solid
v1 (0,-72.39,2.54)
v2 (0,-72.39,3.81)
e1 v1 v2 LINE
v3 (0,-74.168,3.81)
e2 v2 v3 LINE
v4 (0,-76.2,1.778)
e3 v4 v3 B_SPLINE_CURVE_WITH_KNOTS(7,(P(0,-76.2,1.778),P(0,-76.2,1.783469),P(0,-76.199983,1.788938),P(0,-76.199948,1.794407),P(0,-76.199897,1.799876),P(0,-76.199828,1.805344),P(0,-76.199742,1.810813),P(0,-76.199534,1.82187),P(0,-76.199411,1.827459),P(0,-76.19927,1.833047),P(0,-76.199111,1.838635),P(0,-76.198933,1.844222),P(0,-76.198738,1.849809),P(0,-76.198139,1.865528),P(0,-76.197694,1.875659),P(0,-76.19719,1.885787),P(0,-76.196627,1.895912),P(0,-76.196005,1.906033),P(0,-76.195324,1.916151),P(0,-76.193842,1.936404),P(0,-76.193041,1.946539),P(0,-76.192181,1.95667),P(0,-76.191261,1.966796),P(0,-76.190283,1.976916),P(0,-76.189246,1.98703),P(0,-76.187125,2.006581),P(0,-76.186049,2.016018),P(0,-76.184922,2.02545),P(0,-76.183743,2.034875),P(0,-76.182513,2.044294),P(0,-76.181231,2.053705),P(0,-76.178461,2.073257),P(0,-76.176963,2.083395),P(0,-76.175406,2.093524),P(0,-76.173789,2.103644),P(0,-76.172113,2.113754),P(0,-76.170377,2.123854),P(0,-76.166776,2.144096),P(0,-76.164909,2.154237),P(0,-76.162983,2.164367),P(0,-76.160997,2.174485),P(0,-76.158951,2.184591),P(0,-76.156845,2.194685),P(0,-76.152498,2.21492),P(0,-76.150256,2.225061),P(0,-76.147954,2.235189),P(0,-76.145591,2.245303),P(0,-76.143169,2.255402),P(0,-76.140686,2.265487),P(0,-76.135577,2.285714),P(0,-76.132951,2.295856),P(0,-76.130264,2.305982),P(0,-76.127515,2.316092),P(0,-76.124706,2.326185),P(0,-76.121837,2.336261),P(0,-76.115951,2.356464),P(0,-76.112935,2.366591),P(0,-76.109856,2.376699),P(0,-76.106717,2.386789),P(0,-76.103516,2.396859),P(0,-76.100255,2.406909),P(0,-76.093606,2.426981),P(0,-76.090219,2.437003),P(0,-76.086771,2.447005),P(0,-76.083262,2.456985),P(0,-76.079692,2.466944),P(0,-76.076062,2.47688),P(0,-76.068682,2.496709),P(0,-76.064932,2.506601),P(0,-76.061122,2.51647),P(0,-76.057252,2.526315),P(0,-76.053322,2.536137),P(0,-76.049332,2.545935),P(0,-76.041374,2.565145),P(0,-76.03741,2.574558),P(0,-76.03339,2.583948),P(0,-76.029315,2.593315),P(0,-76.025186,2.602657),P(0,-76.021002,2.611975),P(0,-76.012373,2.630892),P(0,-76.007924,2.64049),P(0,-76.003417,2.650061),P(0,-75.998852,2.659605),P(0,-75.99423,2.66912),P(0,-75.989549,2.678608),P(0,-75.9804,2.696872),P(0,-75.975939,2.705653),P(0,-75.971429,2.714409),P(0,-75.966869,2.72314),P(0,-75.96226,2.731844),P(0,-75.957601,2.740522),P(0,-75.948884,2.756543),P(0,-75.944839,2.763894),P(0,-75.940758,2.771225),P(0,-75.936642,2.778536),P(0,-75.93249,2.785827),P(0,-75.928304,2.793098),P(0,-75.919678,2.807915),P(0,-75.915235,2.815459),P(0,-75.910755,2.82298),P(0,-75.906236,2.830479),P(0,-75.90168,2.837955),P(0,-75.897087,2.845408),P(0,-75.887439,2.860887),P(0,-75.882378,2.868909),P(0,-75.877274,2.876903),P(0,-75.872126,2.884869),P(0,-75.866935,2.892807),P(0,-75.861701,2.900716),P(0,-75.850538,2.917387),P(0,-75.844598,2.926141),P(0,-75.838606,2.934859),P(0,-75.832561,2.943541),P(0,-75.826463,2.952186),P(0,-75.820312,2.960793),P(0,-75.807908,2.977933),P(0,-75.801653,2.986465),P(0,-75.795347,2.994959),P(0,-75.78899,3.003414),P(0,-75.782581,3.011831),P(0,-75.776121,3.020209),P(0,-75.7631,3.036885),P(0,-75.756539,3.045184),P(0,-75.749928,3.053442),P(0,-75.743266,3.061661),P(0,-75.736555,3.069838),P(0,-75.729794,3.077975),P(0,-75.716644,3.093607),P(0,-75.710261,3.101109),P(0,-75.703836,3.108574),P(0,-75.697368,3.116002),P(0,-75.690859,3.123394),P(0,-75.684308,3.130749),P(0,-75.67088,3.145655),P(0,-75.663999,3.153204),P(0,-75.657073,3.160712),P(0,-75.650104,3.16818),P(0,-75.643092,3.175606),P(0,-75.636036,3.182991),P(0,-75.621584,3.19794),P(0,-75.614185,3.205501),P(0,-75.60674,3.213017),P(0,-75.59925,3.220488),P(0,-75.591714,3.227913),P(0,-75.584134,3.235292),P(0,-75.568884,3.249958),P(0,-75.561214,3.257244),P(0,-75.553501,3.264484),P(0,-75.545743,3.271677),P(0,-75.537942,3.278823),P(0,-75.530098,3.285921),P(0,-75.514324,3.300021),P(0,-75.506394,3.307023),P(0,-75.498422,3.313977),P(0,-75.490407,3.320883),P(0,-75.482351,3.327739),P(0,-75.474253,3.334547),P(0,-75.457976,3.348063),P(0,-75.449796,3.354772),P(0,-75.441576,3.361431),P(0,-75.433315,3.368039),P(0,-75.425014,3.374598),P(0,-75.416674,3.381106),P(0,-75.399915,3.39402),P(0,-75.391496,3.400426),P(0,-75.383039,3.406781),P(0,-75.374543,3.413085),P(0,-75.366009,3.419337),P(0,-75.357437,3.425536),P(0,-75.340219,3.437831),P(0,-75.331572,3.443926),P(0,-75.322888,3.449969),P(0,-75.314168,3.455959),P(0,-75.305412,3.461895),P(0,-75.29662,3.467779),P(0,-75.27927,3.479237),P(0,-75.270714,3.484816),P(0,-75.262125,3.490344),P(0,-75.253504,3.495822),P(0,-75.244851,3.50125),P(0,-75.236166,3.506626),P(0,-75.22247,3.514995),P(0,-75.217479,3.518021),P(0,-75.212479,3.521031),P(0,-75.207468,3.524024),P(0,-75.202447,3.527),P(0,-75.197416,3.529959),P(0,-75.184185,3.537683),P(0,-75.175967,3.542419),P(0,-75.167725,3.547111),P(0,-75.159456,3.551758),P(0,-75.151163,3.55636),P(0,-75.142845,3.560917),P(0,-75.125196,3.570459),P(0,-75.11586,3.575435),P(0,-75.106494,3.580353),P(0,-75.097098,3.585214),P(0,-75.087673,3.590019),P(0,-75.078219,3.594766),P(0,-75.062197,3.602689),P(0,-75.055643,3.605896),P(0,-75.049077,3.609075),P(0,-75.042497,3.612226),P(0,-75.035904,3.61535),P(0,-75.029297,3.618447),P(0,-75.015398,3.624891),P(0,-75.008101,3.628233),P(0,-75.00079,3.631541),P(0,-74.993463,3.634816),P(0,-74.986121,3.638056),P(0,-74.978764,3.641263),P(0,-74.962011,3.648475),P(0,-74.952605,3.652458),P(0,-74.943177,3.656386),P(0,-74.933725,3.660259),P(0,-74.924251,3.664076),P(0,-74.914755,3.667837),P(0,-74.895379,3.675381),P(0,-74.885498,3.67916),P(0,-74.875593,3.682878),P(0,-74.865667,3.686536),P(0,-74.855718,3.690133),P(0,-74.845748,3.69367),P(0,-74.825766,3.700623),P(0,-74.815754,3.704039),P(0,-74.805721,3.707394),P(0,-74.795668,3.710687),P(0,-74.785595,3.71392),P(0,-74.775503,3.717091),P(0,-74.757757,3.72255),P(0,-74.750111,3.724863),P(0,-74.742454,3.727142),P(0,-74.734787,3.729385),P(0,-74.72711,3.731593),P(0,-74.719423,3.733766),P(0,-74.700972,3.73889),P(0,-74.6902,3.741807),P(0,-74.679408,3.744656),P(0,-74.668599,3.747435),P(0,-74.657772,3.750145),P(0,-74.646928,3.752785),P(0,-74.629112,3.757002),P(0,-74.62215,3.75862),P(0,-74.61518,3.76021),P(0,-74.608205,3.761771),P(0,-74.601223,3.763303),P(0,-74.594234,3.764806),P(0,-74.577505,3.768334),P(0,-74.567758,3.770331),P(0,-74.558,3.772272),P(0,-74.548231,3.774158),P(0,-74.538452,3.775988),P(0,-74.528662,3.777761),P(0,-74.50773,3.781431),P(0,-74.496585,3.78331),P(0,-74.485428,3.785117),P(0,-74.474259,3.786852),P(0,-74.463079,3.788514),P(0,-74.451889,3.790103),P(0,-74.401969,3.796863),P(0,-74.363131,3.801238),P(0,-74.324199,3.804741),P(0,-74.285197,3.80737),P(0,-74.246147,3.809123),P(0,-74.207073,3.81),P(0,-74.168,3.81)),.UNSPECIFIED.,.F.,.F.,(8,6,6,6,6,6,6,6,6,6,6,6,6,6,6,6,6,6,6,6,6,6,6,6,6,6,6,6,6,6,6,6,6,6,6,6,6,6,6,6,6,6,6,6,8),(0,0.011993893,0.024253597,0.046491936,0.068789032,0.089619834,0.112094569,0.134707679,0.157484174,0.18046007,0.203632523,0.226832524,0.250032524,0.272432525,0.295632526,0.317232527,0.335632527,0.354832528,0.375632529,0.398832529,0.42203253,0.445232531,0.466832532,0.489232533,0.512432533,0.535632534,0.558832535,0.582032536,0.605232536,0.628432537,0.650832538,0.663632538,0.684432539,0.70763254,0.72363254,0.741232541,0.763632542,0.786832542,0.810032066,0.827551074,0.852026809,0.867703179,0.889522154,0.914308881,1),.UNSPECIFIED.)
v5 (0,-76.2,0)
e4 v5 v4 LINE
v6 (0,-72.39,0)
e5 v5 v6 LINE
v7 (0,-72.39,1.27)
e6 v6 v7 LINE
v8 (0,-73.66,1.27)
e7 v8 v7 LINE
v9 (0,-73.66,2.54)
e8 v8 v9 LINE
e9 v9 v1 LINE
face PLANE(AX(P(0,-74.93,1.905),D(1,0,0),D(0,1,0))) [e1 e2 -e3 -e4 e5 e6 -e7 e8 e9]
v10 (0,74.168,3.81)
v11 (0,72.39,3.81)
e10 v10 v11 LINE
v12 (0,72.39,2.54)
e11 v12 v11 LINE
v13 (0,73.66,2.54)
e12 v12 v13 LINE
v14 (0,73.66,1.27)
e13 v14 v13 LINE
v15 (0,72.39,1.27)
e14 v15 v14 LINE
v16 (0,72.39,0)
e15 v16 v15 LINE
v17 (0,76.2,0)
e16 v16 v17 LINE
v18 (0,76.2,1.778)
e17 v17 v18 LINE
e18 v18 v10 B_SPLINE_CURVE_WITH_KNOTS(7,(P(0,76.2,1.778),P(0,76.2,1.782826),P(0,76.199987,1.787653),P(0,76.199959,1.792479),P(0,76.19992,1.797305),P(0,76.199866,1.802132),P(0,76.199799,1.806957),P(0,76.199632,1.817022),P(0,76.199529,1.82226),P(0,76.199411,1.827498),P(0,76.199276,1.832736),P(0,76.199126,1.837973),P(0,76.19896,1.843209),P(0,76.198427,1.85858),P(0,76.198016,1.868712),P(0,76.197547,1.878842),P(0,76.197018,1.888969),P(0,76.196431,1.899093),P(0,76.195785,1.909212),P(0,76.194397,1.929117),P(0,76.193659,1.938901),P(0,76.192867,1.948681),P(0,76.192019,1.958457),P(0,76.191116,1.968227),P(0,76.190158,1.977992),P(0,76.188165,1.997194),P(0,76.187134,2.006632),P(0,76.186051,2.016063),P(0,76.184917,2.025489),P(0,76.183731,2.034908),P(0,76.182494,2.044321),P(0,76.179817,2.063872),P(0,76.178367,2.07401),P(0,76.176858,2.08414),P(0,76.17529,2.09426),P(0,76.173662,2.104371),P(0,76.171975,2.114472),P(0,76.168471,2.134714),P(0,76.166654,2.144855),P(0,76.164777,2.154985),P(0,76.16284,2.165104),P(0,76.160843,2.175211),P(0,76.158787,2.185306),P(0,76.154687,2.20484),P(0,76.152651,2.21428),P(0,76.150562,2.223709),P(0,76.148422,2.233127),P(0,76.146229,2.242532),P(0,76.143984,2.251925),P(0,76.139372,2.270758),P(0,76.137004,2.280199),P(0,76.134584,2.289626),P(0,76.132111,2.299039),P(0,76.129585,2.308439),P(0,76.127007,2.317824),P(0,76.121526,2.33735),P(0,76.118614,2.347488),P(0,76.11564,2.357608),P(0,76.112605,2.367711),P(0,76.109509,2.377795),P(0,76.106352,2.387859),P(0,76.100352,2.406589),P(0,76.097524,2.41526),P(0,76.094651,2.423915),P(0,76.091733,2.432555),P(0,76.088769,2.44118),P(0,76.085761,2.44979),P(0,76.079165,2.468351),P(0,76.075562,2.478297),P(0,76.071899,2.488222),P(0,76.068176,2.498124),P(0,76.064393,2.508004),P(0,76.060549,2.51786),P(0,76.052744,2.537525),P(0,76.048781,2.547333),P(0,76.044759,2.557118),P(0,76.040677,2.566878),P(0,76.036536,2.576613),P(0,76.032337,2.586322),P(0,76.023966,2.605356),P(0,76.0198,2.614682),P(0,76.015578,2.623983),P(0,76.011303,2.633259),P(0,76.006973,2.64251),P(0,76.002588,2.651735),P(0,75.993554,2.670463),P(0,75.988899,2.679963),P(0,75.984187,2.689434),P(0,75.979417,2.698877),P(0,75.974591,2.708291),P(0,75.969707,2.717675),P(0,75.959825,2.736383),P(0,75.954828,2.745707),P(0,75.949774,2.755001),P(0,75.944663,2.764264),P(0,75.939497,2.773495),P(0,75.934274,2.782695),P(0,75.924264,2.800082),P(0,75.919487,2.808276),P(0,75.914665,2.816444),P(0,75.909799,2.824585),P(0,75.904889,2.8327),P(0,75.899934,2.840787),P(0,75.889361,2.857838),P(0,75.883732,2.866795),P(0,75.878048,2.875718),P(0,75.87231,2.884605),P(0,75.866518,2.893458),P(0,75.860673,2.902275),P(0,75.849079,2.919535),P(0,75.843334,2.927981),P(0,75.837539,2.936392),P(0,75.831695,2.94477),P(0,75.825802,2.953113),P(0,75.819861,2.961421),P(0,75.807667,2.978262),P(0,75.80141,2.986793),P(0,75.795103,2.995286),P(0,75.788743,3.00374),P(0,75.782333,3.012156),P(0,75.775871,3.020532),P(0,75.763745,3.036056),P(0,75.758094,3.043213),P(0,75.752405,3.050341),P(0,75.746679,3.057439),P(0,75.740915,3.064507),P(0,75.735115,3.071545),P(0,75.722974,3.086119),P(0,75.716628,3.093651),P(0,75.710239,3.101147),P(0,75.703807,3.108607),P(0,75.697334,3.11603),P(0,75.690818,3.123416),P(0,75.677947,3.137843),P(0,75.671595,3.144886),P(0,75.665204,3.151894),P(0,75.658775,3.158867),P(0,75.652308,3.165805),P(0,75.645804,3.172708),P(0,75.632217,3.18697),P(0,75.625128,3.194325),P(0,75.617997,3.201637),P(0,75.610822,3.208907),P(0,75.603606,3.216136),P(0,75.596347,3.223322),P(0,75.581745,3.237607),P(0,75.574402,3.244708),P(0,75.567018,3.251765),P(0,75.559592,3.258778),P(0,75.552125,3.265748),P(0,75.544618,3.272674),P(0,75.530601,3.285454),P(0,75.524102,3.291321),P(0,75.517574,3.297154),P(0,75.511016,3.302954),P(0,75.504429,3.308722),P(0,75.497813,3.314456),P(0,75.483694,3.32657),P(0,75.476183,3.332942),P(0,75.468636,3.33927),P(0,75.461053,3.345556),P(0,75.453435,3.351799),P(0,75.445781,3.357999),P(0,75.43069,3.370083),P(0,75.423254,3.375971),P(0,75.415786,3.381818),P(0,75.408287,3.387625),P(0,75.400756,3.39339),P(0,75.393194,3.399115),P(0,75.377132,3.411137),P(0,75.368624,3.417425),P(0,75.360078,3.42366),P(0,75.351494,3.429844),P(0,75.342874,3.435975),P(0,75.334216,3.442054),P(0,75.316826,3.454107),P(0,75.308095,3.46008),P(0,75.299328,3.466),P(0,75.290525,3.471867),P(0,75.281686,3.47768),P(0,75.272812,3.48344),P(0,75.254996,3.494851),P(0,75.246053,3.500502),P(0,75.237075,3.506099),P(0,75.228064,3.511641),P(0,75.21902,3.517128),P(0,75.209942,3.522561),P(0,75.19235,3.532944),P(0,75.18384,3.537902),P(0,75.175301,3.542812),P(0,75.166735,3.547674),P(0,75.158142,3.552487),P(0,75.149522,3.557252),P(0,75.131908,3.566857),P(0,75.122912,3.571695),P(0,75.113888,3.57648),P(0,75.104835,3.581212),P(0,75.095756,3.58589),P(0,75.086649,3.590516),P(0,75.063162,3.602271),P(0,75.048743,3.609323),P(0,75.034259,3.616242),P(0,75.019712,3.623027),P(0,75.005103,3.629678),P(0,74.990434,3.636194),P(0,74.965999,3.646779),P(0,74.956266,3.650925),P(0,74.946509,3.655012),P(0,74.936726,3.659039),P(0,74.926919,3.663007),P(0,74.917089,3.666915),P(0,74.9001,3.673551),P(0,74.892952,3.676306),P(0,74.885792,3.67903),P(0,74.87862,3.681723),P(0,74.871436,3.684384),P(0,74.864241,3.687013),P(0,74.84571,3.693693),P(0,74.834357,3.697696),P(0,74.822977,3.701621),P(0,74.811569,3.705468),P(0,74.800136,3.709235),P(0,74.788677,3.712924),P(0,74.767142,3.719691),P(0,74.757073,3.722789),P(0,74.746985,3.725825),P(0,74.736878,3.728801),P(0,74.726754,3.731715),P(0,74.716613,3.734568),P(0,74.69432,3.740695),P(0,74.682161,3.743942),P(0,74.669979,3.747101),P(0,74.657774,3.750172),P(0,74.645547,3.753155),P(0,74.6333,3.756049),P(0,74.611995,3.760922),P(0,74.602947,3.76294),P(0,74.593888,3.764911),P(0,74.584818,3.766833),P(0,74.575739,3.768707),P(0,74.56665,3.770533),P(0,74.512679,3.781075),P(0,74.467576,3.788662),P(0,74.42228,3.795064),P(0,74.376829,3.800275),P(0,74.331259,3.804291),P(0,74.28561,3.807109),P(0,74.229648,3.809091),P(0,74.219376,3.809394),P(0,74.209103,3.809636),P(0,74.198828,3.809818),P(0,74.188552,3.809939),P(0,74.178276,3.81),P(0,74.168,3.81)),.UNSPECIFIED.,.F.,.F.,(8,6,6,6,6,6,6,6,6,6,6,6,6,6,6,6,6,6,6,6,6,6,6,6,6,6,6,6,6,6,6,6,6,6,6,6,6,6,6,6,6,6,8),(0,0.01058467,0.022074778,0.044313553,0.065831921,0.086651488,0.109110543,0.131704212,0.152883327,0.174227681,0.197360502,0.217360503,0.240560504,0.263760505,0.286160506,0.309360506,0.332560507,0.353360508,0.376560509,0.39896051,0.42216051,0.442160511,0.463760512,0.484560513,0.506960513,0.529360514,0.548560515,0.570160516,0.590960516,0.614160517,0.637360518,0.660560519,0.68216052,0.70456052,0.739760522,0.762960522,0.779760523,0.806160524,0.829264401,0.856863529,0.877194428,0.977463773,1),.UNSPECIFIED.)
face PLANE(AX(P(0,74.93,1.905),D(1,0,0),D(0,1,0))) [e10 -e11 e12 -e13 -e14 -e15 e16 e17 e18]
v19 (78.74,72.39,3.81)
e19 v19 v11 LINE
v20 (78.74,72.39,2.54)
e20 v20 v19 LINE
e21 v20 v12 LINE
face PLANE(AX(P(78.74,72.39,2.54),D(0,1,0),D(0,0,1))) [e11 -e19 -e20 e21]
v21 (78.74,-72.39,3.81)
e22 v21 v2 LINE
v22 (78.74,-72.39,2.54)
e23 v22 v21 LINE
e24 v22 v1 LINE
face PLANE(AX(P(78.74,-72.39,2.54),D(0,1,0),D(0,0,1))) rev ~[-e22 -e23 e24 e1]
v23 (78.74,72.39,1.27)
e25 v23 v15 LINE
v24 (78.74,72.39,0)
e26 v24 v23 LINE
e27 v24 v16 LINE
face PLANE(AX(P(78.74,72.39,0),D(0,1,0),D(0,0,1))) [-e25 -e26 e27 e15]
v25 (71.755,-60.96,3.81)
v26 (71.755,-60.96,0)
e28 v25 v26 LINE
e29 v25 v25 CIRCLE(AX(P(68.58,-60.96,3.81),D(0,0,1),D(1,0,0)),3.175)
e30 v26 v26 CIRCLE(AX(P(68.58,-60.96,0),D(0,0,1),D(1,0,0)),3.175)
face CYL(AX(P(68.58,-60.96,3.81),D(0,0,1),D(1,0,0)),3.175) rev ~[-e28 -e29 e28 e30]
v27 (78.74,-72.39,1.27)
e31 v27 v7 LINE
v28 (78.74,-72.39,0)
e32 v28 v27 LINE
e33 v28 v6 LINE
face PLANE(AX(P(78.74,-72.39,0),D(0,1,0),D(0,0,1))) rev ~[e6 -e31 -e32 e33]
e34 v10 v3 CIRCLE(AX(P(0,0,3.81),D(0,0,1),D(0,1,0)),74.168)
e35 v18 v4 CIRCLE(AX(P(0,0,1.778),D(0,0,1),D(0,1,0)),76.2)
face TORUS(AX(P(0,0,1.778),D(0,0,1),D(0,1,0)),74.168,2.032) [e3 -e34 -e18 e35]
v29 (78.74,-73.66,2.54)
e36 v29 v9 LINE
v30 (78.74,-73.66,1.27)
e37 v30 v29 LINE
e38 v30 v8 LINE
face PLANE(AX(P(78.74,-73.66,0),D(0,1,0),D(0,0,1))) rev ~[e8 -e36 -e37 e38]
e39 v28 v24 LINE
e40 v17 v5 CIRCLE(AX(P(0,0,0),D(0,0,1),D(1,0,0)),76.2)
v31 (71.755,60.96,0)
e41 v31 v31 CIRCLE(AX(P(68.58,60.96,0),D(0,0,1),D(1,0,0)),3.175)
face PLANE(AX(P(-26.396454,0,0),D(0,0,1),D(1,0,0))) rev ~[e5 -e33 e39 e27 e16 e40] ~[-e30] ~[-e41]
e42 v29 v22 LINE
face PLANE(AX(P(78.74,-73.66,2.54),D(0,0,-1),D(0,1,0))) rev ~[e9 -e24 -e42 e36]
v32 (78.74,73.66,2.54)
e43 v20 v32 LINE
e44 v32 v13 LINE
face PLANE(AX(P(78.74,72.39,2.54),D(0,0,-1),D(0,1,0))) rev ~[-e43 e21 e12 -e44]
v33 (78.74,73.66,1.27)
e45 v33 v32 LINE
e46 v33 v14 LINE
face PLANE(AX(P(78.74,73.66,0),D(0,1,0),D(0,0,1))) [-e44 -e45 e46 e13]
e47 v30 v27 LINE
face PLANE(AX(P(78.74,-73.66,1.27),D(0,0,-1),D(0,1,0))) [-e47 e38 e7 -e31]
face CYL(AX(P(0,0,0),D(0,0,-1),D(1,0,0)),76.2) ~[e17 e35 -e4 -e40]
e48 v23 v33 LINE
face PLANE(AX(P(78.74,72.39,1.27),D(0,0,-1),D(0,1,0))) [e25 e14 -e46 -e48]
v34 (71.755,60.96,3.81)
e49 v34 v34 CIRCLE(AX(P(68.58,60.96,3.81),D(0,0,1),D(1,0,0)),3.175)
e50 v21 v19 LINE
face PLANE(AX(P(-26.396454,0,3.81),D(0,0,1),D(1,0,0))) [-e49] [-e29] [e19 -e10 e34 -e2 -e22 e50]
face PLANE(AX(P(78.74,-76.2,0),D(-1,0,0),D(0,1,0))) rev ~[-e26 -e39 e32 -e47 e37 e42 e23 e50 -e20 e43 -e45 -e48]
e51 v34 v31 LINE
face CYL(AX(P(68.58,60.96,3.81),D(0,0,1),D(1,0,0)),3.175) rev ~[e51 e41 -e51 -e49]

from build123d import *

# Parameters (mm, degrees)
F1_DEPTH = 3.81
F2_W     = 2.54
F2_H     = 3.81
F3_DEPTH = 78.74
F4_W     = 1.27
F4_H     = 1.27
F5_DEPTH = 78.74
F6_R     = 3.175
F7_DEPTH = 25.4
F8_R     = 2.032


# Not quite as in the source:
# - a feature names something its author has since deleted; it is built from what else it names


with BuildPart() as f1:
    # F0 (on Top) → F1 (new body)
    with BuildSketch(Plane.XY):
        with BuildLine():
            Line((0, -76.2), (0, 76.2))
            ThreePointArc((0, 76.2), (-76.2, 0), (0, -76.2))
        make_face()
        with BuildLine():
            ThreePointArc((0, -76.2), (53.8815367264, -53.8815367264), (76.2, 0))
            ThreePointArc((76.2, 0), (53.8815367264, 53.8815367264), (0, 76.2))
            Line((0, 76.2), (0, -76.2))
        make_face()
        with BuildLine():
            ThreePointArc((0, 76.2), (53.8815367264, 53.8815367264), (76.2, 0))
            ThreePointArc((76.2, 0), (53.8815367264, -53.8815367264), (0, -76.2))
            Line((0, -76.2), (78.74, -76.2))
            Line((78.74, -76.2), (78.74, 76.2))
            Line((78.74, 76.2), (0, 76.2))
        make_face()
    extrude(amount=F1_DEPTH)

    # F2 (on face) → F3 (cut)
    with BuildSketch(Plane.YZ.offset(78.74)):
        with Locations((-74.93, 1.905)):
            Rectangle(F2_W, F2_H)
        with Locations((74.93, 1.905)):
            Rectangle(F2_W, F2_H)
    extrude(amount=-F3_DEPTH, mode=Mode.SUBTRACT)

    # F4 (on face) → F5 (cut)
    with BuildSketch(Plane.YZ.offset(78.74)):
        with Locations((-73.025, 3.175)):
            Rectangle(F4_W, F4_H)
        with Locations((-73.025, 0.635)):
            Rectangle(F4_W, F4_H)
        with Locations((73.025, 3.175)):
            Rectangle(F4_W, F4_H)
        with Locations((73.025, 0.635)):
            Rectangle(F4_W, F4_H)
    extrude(amount=-F5_DEPTH, mode=Mode.SUBTRACT)

    # F6 (on face) → F7 (cut)
    with BuildSketch(Plane.XY.offset(3.81)):
        with Locations((68.58, 60.96)):
            Circle(F6_R)
        with Locations((68.58, -60.96)):
            Circle(F6_R)
    extrude(amount=-F7_DEPTH, mode=Mode.SUBTRACT)

    # F8
    f8_edges = [f1.edges().sort_by_distance(p)[0] for p in [
        (-76.2, 0, 3.81),
    ]]
    fillet(f8_edges, radius=F8_R)


solid = f1.part
